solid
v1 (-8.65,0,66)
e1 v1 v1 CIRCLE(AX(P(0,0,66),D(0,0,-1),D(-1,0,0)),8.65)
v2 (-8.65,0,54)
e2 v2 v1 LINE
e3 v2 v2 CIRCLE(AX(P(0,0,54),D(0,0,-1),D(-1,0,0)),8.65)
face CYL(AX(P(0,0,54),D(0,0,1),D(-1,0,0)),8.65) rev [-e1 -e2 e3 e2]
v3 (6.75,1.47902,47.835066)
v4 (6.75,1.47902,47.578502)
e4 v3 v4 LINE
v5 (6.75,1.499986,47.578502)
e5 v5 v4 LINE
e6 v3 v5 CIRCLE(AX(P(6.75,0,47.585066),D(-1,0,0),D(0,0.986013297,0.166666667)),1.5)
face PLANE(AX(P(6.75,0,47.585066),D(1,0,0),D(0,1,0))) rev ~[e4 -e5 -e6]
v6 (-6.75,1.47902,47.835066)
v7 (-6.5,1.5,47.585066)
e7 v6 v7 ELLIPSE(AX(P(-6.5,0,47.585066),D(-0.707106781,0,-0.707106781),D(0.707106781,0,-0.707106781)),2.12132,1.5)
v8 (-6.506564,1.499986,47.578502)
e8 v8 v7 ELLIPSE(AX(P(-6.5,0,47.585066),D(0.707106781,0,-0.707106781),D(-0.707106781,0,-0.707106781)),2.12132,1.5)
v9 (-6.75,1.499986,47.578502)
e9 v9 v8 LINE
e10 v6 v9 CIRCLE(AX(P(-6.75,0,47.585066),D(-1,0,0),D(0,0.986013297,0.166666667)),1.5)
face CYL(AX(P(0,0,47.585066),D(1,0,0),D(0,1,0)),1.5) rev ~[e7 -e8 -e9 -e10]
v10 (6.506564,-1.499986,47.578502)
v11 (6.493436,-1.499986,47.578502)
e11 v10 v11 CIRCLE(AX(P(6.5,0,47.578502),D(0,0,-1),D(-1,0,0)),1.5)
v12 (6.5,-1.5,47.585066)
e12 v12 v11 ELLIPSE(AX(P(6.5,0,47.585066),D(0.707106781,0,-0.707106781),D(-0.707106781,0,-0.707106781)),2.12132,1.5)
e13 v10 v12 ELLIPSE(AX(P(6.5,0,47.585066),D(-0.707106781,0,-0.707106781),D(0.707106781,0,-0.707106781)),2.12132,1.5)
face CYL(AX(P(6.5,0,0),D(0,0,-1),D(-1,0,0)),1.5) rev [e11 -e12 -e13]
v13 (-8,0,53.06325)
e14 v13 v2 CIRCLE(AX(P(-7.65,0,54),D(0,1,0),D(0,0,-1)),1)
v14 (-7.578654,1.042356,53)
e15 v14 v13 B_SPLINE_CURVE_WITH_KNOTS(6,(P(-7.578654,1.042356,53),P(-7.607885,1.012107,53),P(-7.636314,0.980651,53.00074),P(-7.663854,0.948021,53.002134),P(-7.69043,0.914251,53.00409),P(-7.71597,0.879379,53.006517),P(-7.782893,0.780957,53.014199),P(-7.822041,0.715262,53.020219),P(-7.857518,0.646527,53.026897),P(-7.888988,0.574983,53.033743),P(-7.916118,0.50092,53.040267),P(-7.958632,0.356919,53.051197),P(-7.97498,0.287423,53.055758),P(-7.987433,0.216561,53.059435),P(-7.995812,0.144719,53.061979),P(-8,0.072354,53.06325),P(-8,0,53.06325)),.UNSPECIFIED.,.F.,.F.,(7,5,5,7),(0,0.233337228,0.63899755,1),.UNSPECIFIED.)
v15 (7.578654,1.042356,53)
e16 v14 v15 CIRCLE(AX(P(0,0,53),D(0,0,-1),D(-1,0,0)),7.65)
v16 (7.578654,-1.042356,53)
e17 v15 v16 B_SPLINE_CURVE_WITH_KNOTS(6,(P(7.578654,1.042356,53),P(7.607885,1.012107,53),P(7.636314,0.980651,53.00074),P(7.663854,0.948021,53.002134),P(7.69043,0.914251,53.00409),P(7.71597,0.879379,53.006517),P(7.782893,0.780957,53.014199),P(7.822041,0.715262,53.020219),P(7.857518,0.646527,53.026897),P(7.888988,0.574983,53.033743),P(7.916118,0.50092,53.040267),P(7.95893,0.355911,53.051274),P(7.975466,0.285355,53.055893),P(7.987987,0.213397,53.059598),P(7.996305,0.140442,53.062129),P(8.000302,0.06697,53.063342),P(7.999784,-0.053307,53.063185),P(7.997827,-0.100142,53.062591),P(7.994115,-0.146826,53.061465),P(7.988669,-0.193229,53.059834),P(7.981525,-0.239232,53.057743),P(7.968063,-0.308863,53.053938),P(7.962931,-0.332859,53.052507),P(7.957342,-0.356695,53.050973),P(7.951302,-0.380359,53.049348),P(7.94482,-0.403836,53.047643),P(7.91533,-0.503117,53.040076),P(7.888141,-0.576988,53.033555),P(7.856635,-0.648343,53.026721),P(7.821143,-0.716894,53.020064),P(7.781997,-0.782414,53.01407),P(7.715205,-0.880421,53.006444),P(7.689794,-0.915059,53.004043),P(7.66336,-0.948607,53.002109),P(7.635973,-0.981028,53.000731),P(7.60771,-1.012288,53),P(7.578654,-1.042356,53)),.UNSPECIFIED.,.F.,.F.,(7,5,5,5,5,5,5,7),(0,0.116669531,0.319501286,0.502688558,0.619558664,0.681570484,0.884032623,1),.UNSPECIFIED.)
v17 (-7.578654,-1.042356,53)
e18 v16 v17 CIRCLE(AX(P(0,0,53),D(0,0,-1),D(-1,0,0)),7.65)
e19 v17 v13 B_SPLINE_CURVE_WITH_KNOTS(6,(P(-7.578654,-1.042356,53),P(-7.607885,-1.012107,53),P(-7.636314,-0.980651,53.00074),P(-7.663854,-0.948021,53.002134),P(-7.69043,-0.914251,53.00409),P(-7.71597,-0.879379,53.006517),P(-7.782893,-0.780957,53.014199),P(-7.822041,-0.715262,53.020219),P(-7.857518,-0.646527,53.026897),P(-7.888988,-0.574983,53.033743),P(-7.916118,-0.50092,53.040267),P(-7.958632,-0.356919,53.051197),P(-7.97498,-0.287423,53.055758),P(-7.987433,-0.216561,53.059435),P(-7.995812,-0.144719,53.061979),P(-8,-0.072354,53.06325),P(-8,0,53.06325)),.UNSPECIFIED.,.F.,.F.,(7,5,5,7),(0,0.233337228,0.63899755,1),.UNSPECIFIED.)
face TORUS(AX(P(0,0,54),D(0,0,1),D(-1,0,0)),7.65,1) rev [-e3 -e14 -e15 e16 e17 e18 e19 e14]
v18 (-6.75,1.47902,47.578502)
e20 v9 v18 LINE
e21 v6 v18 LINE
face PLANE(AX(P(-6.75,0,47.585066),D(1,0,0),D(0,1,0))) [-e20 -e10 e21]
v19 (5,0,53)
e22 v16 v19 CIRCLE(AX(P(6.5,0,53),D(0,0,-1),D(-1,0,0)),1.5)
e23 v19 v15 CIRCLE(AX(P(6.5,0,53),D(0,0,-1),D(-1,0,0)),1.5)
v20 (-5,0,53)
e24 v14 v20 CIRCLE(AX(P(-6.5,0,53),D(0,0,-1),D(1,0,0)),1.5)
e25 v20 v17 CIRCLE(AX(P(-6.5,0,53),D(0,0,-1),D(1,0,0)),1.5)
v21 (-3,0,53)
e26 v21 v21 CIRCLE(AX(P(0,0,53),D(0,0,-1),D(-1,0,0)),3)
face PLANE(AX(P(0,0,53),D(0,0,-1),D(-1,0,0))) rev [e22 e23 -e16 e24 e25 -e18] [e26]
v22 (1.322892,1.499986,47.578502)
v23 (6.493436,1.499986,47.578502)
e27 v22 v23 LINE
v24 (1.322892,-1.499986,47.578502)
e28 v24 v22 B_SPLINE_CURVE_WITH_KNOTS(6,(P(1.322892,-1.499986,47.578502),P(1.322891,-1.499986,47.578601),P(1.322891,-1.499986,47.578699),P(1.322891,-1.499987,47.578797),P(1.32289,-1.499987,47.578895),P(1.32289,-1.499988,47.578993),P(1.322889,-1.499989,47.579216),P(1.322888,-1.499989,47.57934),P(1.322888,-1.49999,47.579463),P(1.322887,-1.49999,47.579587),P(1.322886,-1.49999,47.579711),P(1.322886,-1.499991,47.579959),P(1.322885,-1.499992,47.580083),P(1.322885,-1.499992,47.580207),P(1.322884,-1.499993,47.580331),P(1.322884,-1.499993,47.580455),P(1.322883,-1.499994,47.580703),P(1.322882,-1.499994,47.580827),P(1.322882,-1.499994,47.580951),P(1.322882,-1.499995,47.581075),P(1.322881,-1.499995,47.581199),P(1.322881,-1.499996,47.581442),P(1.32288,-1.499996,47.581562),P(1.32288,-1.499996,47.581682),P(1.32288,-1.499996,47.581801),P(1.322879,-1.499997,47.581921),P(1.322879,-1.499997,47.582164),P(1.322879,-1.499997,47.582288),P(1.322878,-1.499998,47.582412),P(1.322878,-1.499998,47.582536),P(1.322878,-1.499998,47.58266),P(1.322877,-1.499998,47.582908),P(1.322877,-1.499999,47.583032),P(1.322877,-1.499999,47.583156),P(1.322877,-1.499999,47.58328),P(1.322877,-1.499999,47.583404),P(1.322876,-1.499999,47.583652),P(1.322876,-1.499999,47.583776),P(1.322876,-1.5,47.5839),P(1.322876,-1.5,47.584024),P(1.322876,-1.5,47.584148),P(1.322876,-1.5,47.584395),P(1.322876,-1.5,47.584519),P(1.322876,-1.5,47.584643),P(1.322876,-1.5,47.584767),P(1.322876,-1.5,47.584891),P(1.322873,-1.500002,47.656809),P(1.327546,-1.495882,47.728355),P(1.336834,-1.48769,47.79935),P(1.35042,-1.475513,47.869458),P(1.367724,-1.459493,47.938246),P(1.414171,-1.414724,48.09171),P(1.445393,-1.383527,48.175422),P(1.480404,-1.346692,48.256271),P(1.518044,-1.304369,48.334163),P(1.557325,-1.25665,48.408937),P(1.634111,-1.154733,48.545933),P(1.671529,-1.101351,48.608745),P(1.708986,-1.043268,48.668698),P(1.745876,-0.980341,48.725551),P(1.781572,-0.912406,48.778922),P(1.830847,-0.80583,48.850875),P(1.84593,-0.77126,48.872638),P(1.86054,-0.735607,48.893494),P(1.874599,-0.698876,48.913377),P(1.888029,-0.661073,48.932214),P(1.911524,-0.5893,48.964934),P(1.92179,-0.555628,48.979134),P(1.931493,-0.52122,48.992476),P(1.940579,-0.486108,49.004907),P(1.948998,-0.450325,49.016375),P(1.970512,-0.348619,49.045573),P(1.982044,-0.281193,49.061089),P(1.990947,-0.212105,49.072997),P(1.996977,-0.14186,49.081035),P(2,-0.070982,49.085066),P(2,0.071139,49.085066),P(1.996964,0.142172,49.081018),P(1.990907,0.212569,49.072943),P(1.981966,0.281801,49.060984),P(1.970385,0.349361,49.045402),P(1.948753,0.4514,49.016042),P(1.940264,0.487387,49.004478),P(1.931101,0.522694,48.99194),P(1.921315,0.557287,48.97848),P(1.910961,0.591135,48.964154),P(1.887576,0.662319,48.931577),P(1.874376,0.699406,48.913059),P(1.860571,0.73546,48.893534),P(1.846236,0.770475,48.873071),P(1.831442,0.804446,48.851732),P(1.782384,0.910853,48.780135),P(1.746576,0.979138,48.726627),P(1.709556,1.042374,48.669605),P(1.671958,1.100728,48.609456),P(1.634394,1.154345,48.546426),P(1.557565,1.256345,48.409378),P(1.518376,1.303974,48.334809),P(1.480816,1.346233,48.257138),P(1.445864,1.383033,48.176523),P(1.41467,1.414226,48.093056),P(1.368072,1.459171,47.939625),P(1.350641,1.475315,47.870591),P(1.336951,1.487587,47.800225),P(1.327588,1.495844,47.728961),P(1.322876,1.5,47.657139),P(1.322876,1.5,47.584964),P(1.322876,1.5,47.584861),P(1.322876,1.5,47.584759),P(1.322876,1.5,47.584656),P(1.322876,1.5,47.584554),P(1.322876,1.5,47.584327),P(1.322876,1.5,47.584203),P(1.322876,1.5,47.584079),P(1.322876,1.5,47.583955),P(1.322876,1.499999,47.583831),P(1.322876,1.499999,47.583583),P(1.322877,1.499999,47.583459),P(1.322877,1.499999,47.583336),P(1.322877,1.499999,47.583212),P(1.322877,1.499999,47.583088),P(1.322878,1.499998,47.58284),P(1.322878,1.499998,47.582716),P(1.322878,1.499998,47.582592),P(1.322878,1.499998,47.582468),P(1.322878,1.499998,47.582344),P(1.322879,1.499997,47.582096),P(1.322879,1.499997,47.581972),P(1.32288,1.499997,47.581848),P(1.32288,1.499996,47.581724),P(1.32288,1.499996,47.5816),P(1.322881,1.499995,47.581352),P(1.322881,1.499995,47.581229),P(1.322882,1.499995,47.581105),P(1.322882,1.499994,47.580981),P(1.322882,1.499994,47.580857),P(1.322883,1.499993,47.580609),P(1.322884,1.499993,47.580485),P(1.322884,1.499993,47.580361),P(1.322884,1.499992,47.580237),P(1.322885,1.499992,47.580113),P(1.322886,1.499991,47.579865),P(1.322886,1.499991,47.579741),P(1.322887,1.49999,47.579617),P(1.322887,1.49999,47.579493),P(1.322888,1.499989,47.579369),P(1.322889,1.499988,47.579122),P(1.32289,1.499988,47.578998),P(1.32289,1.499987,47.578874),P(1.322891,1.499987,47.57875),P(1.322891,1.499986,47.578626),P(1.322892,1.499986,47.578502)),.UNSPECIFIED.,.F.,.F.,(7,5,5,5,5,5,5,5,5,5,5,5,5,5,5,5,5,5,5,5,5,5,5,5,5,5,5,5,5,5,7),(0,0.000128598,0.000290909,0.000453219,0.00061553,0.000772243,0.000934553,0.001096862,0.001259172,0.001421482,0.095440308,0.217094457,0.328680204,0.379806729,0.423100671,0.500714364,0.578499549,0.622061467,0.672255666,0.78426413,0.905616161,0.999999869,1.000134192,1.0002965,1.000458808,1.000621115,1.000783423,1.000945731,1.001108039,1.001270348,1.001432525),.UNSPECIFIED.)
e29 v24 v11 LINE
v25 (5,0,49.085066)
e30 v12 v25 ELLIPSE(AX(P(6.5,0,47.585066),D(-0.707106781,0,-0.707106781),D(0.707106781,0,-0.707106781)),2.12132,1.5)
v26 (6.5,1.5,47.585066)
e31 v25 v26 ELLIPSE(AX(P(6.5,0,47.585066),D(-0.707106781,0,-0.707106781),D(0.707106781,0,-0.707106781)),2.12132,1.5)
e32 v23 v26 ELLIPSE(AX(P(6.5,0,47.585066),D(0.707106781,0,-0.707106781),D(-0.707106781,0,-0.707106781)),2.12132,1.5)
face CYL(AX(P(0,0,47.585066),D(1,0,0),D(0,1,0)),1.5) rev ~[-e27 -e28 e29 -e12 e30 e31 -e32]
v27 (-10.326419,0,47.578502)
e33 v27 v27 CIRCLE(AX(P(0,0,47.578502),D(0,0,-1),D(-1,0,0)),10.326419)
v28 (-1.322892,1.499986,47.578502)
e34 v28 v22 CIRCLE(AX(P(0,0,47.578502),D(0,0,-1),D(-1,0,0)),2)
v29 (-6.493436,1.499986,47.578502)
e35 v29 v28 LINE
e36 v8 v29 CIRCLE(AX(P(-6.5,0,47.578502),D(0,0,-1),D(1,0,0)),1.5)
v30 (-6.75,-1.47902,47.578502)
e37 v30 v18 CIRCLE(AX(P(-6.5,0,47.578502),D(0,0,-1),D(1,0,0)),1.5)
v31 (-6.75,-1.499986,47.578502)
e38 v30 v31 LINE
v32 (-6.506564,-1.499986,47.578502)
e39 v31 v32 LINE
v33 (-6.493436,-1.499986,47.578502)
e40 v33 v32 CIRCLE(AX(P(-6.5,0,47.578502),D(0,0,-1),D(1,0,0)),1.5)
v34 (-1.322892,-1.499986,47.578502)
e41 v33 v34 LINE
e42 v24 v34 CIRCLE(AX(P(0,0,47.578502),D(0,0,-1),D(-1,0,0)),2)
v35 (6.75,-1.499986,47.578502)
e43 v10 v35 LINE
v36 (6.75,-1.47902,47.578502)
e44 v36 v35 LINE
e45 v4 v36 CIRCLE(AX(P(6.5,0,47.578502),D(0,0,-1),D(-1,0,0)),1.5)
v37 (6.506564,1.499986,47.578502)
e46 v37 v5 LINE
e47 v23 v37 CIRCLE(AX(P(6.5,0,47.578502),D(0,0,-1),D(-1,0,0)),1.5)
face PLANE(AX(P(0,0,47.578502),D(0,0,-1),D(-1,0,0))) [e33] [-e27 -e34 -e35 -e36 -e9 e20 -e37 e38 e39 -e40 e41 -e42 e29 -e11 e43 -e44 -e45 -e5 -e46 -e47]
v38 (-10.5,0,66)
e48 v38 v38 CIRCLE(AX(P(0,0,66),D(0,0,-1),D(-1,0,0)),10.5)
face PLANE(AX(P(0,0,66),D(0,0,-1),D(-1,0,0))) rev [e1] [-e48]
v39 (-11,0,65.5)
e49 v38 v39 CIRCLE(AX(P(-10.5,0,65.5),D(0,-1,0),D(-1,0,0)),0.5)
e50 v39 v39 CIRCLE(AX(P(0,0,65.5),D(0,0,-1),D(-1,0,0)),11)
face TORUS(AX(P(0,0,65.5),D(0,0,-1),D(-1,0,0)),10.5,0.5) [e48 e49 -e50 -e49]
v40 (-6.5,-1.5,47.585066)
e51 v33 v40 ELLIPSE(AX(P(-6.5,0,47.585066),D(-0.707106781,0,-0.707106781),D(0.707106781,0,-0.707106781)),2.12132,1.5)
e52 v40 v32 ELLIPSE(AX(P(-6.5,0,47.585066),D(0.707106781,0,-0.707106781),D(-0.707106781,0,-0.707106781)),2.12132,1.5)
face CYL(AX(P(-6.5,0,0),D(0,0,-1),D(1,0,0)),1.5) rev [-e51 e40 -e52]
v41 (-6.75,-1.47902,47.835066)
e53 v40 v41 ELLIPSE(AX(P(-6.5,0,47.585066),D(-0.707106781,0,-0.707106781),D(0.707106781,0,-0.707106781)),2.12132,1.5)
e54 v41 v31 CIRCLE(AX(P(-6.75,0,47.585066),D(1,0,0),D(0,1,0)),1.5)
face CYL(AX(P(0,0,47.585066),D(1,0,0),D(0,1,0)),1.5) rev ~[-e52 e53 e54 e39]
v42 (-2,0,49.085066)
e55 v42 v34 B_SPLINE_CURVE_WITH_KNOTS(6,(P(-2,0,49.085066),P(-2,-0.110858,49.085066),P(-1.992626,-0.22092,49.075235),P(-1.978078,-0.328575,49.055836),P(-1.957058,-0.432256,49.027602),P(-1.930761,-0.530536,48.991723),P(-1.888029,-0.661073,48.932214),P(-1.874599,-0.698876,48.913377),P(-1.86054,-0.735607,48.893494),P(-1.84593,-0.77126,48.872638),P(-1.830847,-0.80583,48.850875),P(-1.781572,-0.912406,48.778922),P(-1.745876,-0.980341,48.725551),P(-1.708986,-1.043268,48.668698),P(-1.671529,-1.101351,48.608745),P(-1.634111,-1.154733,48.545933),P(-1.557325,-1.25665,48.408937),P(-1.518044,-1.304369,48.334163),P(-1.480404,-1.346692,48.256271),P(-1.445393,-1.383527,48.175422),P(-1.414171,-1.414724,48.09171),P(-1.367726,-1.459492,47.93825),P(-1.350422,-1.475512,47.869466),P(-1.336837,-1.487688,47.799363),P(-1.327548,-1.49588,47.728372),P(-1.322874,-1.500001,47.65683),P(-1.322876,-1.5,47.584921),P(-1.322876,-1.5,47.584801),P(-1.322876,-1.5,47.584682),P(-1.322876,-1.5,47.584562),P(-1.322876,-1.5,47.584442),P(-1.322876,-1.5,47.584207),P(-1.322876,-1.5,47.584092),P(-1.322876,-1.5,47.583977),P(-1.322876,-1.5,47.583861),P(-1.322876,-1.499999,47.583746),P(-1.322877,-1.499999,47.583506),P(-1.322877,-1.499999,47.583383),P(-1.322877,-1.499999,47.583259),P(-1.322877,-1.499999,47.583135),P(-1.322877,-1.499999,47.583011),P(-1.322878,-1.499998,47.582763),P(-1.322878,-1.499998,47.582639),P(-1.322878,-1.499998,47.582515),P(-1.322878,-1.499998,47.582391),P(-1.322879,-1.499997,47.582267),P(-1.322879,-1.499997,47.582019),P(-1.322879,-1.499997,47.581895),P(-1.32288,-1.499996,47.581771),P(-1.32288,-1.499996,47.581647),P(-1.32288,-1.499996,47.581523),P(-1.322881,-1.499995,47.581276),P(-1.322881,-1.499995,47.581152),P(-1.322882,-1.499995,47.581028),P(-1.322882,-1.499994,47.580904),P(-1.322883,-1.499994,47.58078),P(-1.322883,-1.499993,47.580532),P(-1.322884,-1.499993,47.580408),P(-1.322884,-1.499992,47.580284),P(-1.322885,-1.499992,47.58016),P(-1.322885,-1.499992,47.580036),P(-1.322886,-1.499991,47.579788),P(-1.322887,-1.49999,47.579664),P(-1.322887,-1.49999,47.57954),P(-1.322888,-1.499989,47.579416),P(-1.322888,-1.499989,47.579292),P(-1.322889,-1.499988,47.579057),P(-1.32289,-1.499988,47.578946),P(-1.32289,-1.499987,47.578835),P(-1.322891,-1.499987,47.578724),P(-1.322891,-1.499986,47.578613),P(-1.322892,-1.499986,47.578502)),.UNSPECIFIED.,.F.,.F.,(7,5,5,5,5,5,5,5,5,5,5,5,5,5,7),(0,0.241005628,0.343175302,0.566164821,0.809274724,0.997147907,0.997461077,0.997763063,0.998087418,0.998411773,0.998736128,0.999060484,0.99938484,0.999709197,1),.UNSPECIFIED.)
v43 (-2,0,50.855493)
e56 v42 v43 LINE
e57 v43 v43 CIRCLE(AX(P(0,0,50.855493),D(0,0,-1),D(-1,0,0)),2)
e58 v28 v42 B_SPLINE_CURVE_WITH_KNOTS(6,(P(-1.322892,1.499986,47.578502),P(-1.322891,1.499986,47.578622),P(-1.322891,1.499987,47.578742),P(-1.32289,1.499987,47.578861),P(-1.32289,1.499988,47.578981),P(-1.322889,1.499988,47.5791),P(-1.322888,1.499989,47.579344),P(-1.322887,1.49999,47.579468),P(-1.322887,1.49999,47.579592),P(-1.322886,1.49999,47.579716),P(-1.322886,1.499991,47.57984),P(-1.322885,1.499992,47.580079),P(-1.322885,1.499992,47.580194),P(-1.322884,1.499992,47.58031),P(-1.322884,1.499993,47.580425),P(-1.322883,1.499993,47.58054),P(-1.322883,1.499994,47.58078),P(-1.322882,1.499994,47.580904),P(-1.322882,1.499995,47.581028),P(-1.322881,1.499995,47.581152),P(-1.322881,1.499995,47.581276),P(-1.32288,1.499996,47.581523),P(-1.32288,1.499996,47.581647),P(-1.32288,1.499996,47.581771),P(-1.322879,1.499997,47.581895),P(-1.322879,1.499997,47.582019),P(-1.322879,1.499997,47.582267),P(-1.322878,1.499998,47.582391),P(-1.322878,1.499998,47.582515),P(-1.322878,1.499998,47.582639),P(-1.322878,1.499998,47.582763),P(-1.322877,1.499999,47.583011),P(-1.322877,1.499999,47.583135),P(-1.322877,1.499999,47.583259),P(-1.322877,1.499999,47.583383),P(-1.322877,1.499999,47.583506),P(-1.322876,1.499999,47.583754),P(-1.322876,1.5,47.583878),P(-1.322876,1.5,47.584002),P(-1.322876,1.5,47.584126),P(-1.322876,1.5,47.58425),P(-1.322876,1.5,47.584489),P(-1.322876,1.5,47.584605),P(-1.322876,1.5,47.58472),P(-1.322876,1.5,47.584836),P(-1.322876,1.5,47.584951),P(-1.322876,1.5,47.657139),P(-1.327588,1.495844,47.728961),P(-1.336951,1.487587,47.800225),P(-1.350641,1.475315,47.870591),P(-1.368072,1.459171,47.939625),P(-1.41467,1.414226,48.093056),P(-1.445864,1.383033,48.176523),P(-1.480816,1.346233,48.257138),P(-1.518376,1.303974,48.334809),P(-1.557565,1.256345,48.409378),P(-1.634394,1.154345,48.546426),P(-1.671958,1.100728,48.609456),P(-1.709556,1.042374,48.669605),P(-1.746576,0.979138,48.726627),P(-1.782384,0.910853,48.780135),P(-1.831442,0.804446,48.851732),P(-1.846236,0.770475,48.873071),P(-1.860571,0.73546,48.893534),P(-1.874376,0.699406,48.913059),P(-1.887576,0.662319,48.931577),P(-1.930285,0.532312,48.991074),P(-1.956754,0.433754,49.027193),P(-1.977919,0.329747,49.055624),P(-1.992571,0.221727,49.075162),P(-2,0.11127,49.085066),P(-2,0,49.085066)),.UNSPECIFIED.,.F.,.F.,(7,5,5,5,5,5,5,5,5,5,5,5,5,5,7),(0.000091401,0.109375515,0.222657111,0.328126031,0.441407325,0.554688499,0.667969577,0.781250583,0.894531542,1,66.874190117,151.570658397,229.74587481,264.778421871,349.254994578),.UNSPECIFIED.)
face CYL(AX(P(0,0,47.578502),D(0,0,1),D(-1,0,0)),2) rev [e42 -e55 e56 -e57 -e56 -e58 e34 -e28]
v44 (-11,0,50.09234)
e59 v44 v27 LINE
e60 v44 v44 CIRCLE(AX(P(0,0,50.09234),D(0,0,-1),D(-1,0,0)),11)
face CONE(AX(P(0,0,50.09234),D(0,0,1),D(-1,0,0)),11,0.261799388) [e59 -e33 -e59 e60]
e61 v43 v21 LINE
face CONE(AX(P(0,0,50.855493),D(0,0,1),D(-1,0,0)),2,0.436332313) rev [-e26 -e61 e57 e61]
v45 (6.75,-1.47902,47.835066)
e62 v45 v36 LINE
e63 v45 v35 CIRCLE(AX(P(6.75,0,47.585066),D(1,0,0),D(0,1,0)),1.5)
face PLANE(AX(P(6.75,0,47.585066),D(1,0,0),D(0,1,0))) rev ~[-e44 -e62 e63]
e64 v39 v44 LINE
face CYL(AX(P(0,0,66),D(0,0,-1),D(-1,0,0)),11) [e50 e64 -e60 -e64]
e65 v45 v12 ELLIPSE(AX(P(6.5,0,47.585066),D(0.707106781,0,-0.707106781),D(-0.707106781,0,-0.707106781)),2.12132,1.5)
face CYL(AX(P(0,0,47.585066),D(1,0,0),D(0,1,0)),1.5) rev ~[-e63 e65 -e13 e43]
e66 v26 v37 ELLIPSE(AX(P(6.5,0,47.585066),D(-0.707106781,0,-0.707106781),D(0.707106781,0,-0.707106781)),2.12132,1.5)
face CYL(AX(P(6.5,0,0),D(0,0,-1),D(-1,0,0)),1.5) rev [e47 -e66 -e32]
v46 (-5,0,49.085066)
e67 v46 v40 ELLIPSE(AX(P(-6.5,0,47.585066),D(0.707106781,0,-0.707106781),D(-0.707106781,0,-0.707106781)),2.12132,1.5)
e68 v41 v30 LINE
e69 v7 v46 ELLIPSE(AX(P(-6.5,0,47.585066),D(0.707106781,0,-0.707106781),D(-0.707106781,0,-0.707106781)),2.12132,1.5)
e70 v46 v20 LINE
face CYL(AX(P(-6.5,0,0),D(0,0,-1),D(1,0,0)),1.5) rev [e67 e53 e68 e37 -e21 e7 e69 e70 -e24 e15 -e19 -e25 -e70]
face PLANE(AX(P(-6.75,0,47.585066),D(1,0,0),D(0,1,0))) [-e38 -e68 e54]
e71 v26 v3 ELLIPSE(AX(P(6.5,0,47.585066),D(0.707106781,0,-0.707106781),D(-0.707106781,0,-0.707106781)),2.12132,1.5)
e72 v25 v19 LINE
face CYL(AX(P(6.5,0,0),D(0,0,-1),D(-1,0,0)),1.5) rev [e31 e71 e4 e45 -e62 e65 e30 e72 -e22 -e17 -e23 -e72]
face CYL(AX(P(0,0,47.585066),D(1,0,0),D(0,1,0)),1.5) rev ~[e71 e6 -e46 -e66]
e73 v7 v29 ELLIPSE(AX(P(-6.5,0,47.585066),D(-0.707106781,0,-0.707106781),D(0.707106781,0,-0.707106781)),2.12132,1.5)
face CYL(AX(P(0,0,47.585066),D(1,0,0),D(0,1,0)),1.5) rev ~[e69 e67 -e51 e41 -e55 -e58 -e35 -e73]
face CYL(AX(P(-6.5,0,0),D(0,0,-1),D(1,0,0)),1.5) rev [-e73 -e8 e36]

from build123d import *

# Parameters (mm, degrees)
F2_R     = 1.5
F3_DEPTH = 80
F4_R     = 0.5
F5_R     = 1.5
F6_DEPTH = 6.75


# Not quite as in the source:
# - a feature names something its author has since deleted; it is built from what else it names


with BuildPart() as f1:
    # F0 (on Front) → F1 (revolve)
    with BuildSketch(Plane.XZ):
        with BuildLine():
            Line((-8.65, 66), (-11, 66))
            Line((-11, 66), (-11, 50.0923395157))
            Line((-11, 50.0923395157), (-10.3264193874, 47.5785024464))
            Line((-10.3264193874, 47.5785024464), (-2, 47.5785024464))
            Line((-2, 47.5785024464), (-2, 50.8554930795))
            Line((-2, 50.8554930795), (-3, 53))
            Line((-3, 53), (-7.65, 53))
            ThreePointArc((-7.65, 53), (-8.3571067812, 53.2928932188), (-8.65, 54))
            Line((-8.65, 54), (-8.65, 66))
        make_face()
    revolve(axis=Axis((0, 0, 14.8610904367), (0, 0, -1)))

    # F2 (on Top) → F3 (cut)
    with BuildSketch(Plane.XY):
        with Locations((-6.5, 0)):
            Circle(F2_R)
        with BuildLine():
            ThreePointArc((8, 0), (6.5, 1.5), (5, 0))
            ThreePointArc((5, 0), (6.5, -1.5), (8, 0))
        make_face()
    extrude(amount=F3_DEPTH, mode=Mode.SUBTRACT)

    # F4
    f4_edges = [f1.edges().sort_by_distance(p)[0] for p in [
        (11, 0, 66),
    ]]
    fillet(f4_edges, radius=F4_R)

    # F5 (on Right) → F6 (cut, symmetric)
    with BuildSketch(Plane.YZ):
        with Locations((0, 47.5850664079)):
            Circle(F5_R)
    extrude(amount=F6_DEPTH, both=True, mode=Mode.SUBTRACT)


solid = f1.part
